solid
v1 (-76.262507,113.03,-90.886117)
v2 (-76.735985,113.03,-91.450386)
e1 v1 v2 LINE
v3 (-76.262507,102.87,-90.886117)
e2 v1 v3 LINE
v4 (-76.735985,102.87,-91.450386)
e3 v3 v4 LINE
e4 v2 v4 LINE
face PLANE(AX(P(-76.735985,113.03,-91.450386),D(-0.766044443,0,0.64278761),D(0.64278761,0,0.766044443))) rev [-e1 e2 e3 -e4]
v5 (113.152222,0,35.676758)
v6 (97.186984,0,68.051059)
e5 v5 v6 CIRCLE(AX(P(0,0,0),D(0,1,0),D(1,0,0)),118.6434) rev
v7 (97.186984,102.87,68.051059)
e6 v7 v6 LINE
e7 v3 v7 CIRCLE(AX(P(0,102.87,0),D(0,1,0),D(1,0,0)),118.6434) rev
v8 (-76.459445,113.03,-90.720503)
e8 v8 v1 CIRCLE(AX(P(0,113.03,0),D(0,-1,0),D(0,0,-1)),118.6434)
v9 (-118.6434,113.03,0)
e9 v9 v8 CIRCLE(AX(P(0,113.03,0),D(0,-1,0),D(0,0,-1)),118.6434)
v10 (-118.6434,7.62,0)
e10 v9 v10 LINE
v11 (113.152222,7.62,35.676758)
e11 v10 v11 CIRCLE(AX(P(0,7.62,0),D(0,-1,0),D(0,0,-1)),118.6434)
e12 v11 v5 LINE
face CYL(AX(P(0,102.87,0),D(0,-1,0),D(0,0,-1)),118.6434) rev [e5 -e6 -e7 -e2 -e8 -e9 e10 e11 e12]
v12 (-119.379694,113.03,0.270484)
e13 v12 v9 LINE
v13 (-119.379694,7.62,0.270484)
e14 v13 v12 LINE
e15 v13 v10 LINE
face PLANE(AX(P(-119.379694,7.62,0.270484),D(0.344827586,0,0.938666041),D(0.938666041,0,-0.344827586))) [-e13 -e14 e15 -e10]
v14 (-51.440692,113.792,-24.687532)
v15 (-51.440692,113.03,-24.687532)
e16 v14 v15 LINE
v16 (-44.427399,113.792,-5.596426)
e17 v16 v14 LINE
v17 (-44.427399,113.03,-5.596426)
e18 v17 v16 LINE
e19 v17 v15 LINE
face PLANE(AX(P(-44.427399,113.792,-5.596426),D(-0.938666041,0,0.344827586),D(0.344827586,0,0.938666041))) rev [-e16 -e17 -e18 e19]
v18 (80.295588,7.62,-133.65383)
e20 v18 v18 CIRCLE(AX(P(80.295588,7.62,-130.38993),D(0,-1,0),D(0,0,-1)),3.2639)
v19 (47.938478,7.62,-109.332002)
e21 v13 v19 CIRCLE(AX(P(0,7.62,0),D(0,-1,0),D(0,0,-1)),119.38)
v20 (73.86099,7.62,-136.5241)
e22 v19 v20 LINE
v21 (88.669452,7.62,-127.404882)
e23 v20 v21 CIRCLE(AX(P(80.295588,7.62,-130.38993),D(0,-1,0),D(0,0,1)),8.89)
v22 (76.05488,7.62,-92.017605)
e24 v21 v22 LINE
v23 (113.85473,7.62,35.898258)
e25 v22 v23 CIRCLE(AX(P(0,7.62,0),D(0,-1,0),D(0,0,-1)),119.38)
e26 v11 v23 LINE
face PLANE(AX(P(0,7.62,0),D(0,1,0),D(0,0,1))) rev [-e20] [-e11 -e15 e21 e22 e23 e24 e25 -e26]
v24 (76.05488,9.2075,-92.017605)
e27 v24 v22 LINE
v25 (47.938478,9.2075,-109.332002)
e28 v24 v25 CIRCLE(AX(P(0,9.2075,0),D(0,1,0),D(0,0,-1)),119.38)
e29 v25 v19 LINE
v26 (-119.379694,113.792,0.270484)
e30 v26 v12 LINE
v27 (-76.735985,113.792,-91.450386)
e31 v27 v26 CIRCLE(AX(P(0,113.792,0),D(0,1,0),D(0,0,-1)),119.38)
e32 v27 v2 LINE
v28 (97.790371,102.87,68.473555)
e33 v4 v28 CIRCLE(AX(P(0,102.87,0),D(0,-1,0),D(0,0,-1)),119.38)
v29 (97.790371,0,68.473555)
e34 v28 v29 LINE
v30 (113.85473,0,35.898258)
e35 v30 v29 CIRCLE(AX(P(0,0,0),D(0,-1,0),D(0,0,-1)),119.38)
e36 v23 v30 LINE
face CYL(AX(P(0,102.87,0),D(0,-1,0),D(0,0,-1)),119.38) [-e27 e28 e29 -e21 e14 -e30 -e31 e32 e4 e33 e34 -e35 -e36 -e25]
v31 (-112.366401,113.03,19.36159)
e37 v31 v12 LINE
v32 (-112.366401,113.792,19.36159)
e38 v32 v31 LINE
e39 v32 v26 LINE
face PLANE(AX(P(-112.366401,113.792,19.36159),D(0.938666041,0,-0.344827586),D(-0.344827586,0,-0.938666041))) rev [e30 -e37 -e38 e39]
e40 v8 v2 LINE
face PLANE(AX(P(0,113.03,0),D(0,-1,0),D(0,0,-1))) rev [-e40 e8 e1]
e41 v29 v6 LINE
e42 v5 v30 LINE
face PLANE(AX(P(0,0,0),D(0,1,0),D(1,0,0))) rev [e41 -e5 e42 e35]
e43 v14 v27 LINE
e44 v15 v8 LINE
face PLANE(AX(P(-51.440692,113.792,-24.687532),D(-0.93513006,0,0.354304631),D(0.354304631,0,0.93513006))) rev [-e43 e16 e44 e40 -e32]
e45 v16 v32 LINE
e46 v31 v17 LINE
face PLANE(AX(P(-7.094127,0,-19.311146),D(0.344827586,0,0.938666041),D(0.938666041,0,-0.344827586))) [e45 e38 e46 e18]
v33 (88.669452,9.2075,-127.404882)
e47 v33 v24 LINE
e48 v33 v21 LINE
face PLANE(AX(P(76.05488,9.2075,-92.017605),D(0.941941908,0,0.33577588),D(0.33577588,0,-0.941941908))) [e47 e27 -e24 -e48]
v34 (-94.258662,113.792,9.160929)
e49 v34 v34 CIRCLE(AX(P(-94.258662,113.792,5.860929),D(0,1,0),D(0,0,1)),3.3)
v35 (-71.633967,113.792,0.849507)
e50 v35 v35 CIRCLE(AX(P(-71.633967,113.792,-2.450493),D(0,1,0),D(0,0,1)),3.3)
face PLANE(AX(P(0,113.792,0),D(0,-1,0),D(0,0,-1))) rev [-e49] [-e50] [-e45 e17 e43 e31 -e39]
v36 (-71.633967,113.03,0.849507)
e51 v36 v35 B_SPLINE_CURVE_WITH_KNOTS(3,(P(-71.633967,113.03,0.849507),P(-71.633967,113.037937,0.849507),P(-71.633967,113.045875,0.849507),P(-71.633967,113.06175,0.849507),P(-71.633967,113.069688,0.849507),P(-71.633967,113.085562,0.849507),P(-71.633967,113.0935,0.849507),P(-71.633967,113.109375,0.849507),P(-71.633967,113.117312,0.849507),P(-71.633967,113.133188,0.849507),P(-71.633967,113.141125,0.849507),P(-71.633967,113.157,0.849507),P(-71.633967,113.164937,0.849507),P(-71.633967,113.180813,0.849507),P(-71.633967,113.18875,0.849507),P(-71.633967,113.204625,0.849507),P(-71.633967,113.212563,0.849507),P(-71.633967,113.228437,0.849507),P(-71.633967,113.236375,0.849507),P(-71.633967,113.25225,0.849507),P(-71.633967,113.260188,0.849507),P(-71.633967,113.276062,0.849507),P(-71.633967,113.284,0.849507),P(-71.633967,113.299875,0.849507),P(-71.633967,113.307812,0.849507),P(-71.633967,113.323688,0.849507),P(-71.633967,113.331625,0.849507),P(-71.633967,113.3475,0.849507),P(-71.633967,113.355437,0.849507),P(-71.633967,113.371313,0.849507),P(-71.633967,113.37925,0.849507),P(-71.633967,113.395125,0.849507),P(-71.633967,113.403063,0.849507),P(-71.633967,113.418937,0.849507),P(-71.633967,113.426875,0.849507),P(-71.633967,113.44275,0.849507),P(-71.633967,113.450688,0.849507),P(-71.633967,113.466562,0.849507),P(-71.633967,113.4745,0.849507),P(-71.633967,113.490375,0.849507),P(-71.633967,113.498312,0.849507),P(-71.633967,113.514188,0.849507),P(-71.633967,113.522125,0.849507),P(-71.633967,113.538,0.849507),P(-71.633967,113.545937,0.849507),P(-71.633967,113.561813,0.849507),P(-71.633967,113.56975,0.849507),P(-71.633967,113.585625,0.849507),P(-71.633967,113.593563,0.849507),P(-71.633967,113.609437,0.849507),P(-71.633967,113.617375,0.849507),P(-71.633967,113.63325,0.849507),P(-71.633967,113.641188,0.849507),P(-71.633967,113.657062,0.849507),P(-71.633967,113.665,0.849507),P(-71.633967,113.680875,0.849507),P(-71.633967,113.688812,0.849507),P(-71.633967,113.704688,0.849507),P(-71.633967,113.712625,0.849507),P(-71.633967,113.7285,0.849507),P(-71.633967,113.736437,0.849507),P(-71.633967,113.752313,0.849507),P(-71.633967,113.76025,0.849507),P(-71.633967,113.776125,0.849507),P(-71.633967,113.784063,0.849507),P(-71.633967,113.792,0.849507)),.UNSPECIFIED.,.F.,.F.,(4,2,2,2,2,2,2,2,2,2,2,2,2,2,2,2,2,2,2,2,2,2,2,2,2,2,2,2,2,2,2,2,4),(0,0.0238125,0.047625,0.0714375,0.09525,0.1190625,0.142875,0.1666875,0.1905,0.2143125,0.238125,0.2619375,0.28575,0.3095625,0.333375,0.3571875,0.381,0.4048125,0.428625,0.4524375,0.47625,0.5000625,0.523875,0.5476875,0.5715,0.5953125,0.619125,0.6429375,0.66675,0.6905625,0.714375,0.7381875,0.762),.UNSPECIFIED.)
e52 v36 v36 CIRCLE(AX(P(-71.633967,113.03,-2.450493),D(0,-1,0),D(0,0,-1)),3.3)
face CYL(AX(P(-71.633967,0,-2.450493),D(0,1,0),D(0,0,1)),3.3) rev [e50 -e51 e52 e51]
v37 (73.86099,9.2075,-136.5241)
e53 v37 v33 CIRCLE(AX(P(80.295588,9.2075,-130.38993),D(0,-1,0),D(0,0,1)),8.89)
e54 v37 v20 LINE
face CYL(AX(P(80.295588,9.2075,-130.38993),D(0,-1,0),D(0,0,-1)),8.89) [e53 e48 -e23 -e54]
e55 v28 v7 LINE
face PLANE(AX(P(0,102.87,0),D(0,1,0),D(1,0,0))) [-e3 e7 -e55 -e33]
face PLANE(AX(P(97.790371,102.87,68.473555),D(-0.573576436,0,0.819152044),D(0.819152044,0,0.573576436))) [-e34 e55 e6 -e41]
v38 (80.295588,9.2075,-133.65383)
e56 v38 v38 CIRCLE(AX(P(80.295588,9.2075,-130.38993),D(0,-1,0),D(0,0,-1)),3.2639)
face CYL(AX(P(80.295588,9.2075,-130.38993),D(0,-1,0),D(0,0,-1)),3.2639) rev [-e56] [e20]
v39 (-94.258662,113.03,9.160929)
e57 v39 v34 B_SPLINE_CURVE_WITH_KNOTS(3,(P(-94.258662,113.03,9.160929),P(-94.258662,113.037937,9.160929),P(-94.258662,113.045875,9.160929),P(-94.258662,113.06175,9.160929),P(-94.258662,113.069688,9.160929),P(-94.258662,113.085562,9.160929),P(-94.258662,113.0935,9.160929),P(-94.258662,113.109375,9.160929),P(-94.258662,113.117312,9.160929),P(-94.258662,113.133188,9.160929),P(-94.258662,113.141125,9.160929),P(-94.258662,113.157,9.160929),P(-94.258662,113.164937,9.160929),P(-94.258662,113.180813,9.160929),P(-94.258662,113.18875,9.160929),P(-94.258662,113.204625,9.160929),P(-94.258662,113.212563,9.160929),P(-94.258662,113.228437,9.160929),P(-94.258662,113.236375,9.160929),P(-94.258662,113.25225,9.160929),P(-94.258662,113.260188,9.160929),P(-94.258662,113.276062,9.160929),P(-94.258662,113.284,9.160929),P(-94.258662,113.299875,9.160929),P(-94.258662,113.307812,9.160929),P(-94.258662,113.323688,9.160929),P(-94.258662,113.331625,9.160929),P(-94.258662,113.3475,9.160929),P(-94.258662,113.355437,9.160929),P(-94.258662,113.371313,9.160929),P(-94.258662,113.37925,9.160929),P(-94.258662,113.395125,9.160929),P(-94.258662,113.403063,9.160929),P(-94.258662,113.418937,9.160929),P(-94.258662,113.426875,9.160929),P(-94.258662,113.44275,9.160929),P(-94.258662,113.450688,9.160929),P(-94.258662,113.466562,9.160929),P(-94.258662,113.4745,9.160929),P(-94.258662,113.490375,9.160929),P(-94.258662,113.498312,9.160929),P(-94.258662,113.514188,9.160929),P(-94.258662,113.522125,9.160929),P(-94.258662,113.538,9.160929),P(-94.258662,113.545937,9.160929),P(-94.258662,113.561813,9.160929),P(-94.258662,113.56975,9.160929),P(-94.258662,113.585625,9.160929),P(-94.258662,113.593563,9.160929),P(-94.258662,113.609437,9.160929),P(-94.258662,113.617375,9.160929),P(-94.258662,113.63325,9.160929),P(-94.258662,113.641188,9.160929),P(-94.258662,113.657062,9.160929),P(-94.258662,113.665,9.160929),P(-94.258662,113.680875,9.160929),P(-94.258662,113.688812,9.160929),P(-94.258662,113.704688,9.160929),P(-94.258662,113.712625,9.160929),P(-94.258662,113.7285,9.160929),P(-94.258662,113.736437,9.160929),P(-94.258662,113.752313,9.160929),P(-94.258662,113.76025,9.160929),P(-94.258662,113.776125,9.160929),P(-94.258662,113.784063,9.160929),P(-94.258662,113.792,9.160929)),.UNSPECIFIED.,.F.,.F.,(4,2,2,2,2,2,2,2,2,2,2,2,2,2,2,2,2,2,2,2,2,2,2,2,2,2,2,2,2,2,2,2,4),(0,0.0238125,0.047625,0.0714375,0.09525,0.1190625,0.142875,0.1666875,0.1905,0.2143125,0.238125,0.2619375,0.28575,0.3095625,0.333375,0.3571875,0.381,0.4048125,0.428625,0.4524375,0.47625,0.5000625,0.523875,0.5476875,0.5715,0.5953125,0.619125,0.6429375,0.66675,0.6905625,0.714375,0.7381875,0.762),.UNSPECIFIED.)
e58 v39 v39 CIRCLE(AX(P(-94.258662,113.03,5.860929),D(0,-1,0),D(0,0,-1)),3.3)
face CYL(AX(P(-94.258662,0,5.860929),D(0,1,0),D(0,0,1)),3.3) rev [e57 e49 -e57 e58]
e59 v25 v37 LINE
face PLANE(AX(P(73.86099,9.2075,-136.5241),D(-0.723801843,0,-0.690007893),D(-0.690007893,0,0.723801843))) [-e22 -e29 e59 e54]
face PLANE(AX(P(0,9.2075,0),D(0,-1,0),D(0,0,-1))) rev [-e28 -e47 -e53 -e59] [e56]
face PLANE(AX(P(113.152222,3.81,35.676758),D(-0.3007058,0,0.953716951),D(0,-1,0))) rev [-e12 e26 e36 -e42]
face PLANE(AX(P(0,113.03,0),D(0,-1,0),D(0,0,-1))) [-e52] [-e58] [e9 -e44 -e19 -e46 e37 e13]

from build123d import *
from build123d.topology import SkipClean

# Parameters (mm, degrees)
BASE_FLANGE1_DEPTH   = 102.87
CUT_EXTRUDE1_START   = -7.62
CUT_EXTRUDE1_DEPTH   = 7.62
BOSS_EXTRUDE5_START  = -95.25
BOSS_EXTRUDE5_DEPTH  = 95.25
BOSS_EXTRUDE6_DEPTH  = 10.16
BOSS_EXTRUDE7_DEPTH  = 0.762
SKETCH12_W           = 72.378245623
SKETCH12_H           = 0.762
BOSS_EXTRUDE8_DEPTH  = 20.33854962
SKETCH13_R           = 3.3
CUT_EXTRUDE2_DEPTH   = 204.597121983
SKETCH15_R           = 3.2639
BOSS_EXTRUDE10_DEPTH = 1.5875


# Read off the part's stored shape, not the designer's step: Cut-Extrude1
# Sheet-metal steps are written as plain solids
with BuildPart() as part:
    # Sketch2 → Base-Flange1 (new body)
    with BuildSketch(Plane(origin=(0, 0, 0), x_dir=(1, 0, 0), z_dir=(0, 1, 0))):
        with BuildLine():
            ThreePointArc((-119.38, 0), (35.898258345, 113.85472958), (97.790371047, -68.473554972))
            Line((97.790371047, -68.473554972), (97.186983651, -68.051058569))
            ThreePointArc((97.186983651, -68.051058569), (35.676758453, 113.152221674), (-118.6434, 0))
            Line((-118.6434, 0), (-119.38, 0))
        make_face()
    extrude(amount=BASE_FLANGE1_DEPTH)

    # Cut-Extrude1 outline → Cut-Extrude1 (cut)
    with BuildSketch(Plane.XZ.offset(CUT_EXTRUDE1_START)):
        with BuildLine():
            ThreePointArc((-119.38, 0), (18.160489843, -117.990597119), (113.85472958, 35.898258345))
            Line((113.85472958, 35.898258345), (113.152221674, 35.676758453))
            ThreePointArc((113.152221674, 35.676758453), (18.048435757, -117.262570031), (-118.6434, 0))
            Line((-118.6434, 0), (-119.38, 0))
        make_face()
    extrude(amount=CUT_EXTRUDE1_DEPTH, mode=Mode.SUBTRACT)

    # Sketch9 → Boss-Extrude5 (add)
    with BuildSketch(Plane(origin=(0, 102.87, 0), x_dir=(1, 0, 0), z_dir=(0, 1, 0)).offset(BOSS_EXTRUDE5_START)):
        with BuildLine():
            Line((-119.379693576, -0.270484204), (-118.6434, 0))
            Line((-118.6434, 0), (-119.38, 0))
            ThreePointArc((-119.38, 0), (-119.379923394, -0.135242189), (-119.379693576, -0.270484204))
        make_face()
    extrude(amount=BOSS_EXTRUDE5_DEPTH)

    # Sketch10 → Boss-Extrude6 (add)
    with SkipClean():  # the faces are left unmerged after this step: merging them gives an invalid solid
        with BuildSketch(Plane(origin=(0, 102.87, 0), x_dir=(1, 0, 0), z_dir=(0, 1, 0))):
            with BuildLine():
                Line((-119.379693576, -0.270484204), (-118.6434, 0))
                ThreePointArc((-118.6434, 0), (-107.527437301, 50.140867475), (-76.262507491, 90.886117283))
                Line((-76.262507491, 90.886117283), (-76.735984844, 91.45038562))
                ThreePointArc((-76.735984844, 91.45038562), (-108.252110006, 50.329564663), (-119.379693576, -0.270484204))
            make_face()
        extrude(amount=BOSS_EXTRUDE6_DEPTH)

    # Sketch11 → Boss-Extrude7 (add)
    with SkipClean():  # the faces are left unmerged after this step: merging them gives an invalid solid
        with BuildSketch(Plane(origin=(0, 113.03, 0), x_dir=(1, 0, 0), z_dir=(0, 1, 0))):
            with BuildLine():
                Line((-119.379693576, -0.270484204), (-51.440692331, 24.687531528))
                Line((-51.440692331, 24.687531528), (-76.735984844, 91.45038562))
                ThreePointArc((-76.735984844, 91.45038562), (-108.252110006, 50.329564663), (-119.379693576, -0.270484204))
            make_face()
        extrude(amount=BOSS_EXTRUDE7_DEPTH)

    # Sketch12 → Boss-Extrude8 (add)
    with SkipClean():  # the faces are left unmerged after this step: merging them gives an invalid solid
        with BuildSketch(Plane(origin=(-14.107419738, 0, -38.402251904), x_dir=(0.9386660406079884, 0, -0.3448275862069655), z_dir=(0.3448275862069655, 0, 0.9386660406079884))):
            with Locations((-75.961811901, 113.411)):
                Rectangle(SKETCH12_W, SKETCH12_H)
        extrude(amount=BOSS_EXTRUDE8_DEPTH)

    # Sketch13 → Cut-Extrude2 (cut, through all)
    with SkipClean():  # the faces are left unmerged after this step: merging them gives an invalid solid
        with BuildSketch(Plane(origin=(0, 113.792, 0), x_dir=(1, 0, 0), z_dir=(0, 1, 0))):
            with Locations(Location((-94.258662261, -5.860928581, 0), (0, 0, 270))):
                Circle(SKETCH13_R)
            with Locations(Location((-71.633967235, 2.450493285, 0), (0, 0, 270))):
                Circle(SKETCH13_R)
        extrude(amount=-CUT_EXTRUDE2_DEPTH, mode=Mode.SUBTRACT)

    # Sketch15 → Boss-Extrude10 (add)
    with SkipClean():  # the faces are left unmerged after this step: merging them gives an invalid solid
        with BuildSketch(Plane.XZ.offset(-7.62)):
            with BuildLine():
                Line((76.054879624, -92.017605302), (88.669451617, -127.404882133))
                ThreePointArc((88.669451617, -127.404882133), (84.957156503, -137.959730204), (73.860989671, -136.524099874))
                Line((73.860989671, -136.524099874), (47.938477772, -109.332002401))
                ThreePointArc((47.938477772, -109.332002401), (62.598204897, -101.651606695), (76.054879624, -92.017605302))
            make_face()
            with Locations(Location((80.295588053, -130.389929705, 0), (0, 0, 270))):
                Circle(SKETCH15_R, mode=Mode.SUBTRACT)
        extrude(amount=-BOSS_EXTRUDE10_DEPTH)


solid = part.part
